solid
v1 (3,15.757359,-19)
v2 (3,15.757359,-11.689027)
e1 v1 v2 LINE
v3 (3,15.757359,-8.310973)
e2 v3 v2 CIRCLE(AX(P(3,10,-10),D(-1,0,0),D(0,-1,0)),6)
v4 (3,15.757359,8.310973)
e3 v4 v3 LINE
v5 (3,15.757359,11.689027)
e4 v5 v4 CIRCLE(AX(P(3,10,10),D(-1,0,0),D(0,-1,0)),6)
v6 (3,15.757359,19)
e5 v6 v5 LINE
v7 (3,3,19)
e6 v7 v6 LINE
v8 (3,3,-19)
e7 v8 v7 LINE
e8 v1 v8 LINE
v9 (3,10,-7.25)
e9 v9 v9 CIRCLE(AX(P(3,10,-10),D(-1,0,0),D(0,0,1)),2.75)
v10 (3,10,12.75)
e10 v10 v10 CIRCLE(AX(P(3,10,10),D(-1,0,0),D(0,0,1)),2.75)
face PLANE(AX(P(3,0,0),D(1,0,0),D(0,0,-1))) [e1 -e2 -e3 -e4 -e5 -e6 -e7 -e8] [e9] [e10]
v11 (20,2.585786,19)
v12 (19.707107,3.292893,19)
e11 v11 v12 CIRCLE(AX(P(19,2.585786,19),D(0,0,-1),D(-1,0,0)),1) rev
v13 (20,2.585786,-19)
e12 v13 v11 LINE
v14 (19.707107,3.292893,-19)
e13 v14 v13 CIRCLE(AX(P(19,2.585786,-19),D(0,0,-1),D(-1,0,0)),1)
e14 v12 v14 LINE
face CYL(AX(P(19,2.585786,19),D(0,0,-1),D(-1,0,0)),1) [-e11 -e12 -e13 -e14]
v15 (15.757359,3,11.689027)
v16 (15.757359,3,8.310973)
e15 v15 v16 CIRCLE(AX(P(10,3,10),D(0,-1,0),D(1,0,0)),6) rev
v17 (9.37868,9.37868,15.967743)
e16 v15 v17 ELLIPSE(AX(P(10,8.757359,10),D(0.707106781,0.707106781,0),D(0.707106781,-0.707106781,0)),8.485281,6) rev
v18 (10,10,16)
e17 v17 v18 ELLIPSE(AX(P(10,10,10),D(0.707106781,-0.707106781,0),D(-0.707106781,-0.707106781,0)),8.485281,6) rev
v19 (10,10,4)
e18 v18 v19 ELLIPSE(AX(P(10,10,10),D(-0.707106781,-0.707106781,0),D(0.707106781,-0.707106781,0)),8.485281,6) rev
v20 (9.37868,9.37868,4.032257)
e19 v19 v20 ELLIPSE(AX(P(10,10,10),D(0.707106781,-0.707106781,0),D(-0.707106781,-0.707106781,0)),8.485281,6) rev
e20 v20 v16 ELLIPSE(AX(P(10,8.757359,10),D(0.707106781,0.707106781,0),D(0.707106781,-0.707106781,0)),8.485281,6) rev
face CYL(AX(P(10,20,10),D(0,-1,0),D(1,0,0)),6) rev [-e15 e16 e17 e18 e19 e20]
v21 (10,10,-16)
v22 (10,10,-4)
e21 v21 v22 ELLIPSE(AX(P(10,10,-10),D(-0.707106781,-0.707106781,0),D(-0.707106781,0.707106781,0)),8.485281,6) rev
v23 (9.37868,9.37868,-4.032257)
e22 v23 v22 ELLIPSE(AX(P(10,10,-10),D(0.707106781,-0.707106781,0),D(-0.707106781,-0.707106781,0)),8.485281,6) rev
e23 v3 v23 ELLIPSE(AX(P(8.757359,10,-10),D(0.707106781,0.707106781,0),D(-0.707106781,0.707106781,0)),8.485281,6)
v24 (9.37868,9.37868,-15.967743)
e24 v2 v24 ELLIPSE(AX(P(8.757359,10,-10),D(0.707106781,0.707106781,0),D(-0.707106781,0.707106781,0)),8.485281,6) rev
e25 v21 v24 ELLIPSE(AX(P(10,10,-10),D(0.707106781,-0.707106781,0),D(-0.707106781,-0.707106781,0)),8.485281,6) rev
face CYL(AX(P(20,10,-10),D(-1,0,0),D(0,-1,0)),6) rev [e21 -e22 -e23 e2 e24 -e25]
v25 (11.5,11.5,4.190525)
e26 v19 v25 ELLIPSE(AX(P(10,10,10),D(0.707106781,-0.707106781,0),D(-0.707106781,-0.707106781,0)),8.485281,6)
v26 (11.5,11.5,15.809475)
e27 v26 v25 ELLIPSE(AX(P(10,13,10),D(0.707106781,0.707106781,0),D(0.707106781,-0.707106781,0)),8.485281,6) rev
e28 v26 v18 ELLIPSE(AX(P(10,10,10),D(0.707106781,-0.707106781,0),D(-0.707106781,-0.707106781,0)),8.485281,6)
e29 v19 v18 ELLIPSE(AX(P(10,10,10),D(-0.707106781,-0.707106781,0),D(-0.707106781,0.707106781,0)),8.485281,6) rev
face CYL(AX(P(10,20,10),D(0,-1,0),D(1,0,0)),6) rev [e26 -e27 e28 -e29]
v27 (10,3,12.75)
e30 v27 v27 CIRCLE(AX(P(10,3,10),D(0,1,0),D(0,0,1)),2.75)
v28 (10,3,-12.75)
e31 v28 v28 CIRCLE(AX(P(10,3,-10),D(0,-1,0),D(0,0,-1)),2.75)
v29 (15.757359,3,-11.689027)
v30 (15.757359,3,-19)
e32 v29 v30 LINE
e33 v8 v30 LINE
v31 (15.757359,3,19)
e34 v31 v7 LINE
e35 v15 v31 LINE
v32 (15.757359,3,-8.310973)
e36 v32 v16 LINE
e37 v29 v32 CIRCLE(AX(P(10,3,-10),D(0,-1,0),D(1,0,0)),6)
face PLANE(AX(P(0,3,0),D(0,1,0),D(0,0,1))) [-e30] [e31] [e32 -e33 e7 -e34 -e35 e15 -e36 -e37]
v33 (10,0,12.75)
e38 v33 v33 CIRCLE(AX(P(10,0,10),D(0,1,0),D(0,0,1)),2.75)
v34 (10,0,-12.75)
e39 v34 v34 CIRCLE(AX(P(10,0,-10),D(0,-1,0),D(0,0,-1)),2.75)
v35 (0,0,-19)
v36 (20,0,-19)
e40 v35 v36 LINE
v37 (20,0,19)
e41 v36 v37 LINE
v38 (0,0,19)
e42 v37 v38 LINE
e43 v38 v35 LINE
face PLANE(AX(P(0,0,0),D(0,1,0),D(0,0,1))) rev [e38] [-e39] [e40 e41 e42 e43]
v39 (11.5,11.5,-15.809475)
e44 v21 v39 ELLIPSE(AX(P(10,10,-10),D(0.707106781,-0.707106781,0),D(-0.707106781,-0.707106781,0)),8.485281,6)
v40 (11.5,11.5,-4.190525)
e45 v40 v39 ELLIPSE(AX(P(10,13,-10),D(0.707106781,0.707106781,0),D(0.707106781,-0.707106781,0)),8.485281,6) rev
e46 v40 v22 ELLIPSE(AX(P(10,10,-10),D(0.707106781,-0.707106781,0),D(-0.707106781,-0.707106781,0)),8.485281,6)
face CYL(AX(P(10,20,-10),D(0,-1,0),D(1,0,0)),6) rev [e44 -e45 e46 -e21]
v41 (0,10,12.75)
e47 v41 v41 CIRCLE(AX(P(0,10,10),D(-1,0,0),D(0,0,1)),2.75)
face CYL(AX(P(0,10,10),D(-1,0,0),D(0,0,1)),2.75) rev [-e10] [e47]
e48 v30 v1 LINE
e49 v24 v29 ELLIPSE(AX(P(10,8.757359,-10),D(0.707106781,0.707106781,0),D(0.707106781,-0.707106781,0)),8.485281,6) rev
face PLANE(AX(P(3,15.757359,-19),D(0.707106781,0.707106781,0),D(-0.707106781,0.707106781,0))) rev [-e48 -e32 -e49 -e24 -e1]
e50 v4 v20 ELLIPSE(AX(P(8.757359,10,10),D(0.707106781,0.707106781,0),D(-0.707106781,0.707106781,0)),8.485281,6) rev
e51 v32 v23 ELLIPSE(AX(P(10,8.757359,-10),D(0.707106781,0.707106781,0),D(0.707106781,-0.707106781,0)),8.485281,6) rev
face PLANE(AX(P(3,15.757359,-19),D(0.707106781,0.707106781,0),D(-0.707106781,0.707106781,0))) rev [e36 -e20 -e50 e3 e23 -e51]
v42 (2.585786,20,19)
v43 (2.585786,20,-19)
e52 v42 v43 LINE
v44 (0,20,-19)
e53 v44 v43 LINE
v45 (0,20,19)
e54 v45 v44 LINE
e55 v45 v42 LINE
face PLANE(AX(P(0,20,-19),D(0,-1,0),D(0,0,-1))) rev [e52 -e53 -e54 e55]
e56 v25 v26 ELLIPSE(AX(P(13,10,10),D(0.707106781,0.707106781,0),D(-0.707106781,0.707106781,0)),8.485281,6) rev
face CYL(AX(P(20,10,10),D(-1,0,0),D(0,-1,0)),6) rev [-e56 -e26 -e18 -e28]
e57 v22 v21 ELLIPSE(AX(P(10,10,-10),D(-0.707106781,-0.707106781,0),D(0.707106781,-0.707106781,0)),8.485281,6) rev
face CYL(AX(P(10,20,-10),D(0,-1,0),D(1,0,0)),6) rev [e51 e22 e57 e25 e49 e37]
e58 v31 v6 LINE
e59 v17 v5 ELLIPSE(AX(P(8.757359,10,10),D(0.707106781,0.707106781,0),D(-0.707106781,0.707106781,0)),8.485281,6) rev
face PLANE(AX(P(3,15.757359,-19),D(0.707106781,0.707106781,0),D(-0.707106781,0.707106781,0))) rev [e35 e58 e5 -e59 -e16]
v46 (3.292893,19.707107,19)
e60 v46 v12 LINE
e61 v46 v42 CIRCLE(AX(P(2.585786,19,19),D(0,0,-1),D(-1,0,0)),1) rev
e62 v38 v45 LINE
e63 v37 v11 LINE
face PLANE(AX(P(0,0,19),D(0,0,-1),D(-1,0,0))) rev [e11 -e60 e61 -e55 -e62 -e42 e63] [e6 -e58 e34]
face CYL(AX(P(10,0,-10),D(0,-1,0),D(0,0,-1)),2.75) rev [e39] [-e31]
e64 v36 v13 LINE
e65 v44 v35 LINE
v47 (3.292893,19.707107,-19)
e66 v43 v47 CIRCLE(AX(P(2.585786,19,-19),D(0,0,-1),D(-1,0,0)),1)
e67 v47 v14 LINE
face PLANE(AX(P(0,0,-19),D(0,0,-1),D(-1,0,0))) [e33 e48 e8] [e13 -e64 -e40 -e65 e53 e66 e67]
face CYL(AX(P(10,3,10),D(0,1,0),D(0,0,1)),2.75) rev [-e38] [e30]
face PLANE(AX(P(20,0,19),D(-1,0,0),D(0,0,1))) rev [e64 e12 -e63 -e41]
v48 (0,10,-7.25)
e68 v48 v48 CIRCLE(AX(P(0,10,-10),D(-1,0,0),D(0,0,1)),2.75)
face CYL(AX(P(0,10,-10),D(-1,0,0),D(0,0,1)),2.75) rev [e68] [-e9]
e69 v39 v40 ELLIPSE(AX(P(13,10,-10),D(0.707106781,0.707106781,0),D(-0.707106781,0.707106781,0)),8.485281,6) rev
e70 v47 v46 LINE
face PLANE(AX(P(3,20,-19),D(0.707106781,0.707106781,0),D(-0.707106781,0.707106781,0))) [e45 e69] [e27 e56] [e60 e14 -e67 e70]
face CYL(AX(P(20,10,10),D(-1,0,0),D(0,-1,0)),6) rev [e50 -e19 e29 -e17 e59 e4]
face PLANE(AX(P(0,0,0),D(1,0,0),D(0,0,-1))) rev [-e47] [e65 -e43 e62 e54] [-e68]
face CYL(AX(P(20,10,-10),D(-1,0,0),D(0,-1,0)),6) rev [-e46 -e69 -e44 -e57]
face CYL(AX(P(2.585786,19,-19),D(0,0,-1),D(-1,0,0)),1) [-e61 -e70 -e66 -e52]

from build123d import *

# Parameters (mm, degrees)
BOSS_EXTRUDE1_START     = -17
BOSS_EXTRUDE1_OUTLINE_W = 38
BOSS_EXTRUDE1_OUTLINE_H = 17
BOSS_EXTRUDE1_DEPTH     = 20
BOSS_EXTRUDE1_2_DEPTH   = 3
BOSS_EXTRUDE1_START_2   = 3
BOSS_EXTRUDE1_3_DEPTH   = 17
BOSS_EXTRUDE1_START_3   = -19
BOSS_EXTRUDE1_4_DEPTH   = 38
SKETCH2_W               = 20
SKETCH2_H               = 38
BOSS_EXTRUDE2_DEPTH     = 3
F_10_CLEARANCE_HOLE1_D  = 5.5
F_10_CLEARANCE_HOLE2_D  = 5.5
F_10_CLEARANCE_HOLE3_D  = 5.5
F_10_CLEARANCE_HOLE4_D  = 5.5
FILLET1_R               = 1


with BuildPart() as part:
    # Boss-Extrude1: read off the stored shape, not the designer's step
    # Boss-Extrude1 outline → Boss-Extrude1 (new body)
    with BuildSketch(Plane.ZY.offset(-3).offset(BOSS_EXTRUDE1_START)):
        with Locations((0, 11.5)):
            Rectangle(BOSS_EXTRUDE1_OUTLINE_W, BOSS_EXTRUDE1_OUTLINE_H)
        with BuildLine():
            ThreePointArc((-15.967743378, 9.378679656), (-10, 16), (-4.032256622, 9.378679656))
            ThreePointArc((-4.032256622, 9.378679656), (-10, 4), (-15.967743378, 9.378679656))
        make_face(mode=Mode.SUBTRACT)
        with BuildLine():
            ThreePointArc((4.032256622, 9.378679656), (10, 16), (15.967743378, 9.378679656))
            ThreePointArc((15.967743378, 9.378679656), (10, 4), (4.032256622, 9.378679656))
        make_face(mode=Mode.SUBTRACT)
    extrude(amount=BOSS_EXTRUDE1_DEPTH)

    # Boss-Extrude1 2 outline → Boss-Extrude1 2 (add)
    with BuildSketch(Plane.ZY.offset(-3)):
        with BuildLine():
            ThreePointArc((4.032256622, 9.378679656), (10, 4), (15.967743378, 9.378679656))
            ThreePointArc((15.967743378, 9.378679656), (10, 16), (4.032256622, 9.378679656))
        make_face()
        with BuildLine():
            ThreePointArc((-15.967743378, 9.378679656), (-10, 4), (-4.032256622, 9.378679656))
            ThreePointArc((-4.032256622, 9.378679656), (-10, 16), (-15.967743378, 9.378679656))
        make_face()
    extrude(amount=BOSS_EXTRUDE1_2_DEPTH)

    # Boss-Extrude1 3 outline → Boss-Extrude1 3 (cut)
    with BuildSketch(Plane(origin=(0, 0, 0), x_dir=(1, 0, 0), z_dir=(0, 1, 0)).offset(BOSS_EXTRUDE1_START_2)):
        with BuildLine():
            ThreePointArc((9.378679656, -15.967743378), (16, -10), (9.378679656, -4.032256622))
            ThreePointArc((9.378679656, -4.032256622), (4, -10), (9.378679656, -15.967743378))
        make_face()
        with BuildLine():
            ThreePointArc((9.378679656, 4.032256622), (16, 10), (9.378679656, 15.967743378))
            ThreePointArc((9.378679656, 15.967743378), (4, 10), (9.378679656, 4.032256622))
        make_face()
    extrude(amount=BOSS_EXTRUDE1_3_DEPTH, mode=Mode.SUBTRACT)

    # Boss-Extrude1 4 outline → Boss-Extrude1 4 (cut)
    with BuildSketch(Plane.XY.offset(BOSS_EXTRUDE1_START_3)):
        Polygon((3, 3), (15.757359313, 3), (3, 15.757359313), align=None)
        Polygon((3, 20), (20, 3), (20, 20), align=None)
    extrude(amount=BOSS_EXTRUDE1_4_DEPTH, mode=Mode.SUBTRACT)

    # Sketch2 → Boss-Extrude2 (add)
    with BuildSketch(Plane.XZ.offset(-3)):
        with Locations((10, 0)):
            Rectangle(SKETCH2_W, SKETCH2_H)
    extrude(amount=BOSS_EXTRUDE2_DEPTH)

    # #10 Clearance Hole1 (through all)
    with Locations(Plane(origin=(0, 3, 0), x_dir=(1, 0, 0), z_dir=(0, 1, 0))):
        with Locations((10, -10)):
            Hole(F_10_CLEARANCE_HOLE1_D / 2)

    # #10 Clearance Hole2 (through all)
    with Locations(Plane.ZY):
        with Locations((-10, 10)):
            Hole(F_10_CLEARANCE_HOLE2_D / 2)

    # #10 Clearance Hole3 (through all)
    with Locations(Plane.ZY):
        with Locations((10, 10)):
            Hole(F_10_CLEARANCE_HOLE3_D / 2)

    # #10 Clearance Hole4 (through all)
    with Locations(Plane(origin=(0, 0, 0), x_dir=(-1, 0, 0), z_dir=(0, -1, 0))):
        with Locations((-10, 10)):
            Hole(F_10_CLEARANCE_HOLE4_D / 2)

    # Fillet1
    fillet1_edges = [part.edges().sort_by_distance(p)[0] for p in [
        (20, 3, 0),
        (3, 20, 0),
    ]]
    fillet(fillet1_edges, radius=FILLET1_R)


solid = part.part
